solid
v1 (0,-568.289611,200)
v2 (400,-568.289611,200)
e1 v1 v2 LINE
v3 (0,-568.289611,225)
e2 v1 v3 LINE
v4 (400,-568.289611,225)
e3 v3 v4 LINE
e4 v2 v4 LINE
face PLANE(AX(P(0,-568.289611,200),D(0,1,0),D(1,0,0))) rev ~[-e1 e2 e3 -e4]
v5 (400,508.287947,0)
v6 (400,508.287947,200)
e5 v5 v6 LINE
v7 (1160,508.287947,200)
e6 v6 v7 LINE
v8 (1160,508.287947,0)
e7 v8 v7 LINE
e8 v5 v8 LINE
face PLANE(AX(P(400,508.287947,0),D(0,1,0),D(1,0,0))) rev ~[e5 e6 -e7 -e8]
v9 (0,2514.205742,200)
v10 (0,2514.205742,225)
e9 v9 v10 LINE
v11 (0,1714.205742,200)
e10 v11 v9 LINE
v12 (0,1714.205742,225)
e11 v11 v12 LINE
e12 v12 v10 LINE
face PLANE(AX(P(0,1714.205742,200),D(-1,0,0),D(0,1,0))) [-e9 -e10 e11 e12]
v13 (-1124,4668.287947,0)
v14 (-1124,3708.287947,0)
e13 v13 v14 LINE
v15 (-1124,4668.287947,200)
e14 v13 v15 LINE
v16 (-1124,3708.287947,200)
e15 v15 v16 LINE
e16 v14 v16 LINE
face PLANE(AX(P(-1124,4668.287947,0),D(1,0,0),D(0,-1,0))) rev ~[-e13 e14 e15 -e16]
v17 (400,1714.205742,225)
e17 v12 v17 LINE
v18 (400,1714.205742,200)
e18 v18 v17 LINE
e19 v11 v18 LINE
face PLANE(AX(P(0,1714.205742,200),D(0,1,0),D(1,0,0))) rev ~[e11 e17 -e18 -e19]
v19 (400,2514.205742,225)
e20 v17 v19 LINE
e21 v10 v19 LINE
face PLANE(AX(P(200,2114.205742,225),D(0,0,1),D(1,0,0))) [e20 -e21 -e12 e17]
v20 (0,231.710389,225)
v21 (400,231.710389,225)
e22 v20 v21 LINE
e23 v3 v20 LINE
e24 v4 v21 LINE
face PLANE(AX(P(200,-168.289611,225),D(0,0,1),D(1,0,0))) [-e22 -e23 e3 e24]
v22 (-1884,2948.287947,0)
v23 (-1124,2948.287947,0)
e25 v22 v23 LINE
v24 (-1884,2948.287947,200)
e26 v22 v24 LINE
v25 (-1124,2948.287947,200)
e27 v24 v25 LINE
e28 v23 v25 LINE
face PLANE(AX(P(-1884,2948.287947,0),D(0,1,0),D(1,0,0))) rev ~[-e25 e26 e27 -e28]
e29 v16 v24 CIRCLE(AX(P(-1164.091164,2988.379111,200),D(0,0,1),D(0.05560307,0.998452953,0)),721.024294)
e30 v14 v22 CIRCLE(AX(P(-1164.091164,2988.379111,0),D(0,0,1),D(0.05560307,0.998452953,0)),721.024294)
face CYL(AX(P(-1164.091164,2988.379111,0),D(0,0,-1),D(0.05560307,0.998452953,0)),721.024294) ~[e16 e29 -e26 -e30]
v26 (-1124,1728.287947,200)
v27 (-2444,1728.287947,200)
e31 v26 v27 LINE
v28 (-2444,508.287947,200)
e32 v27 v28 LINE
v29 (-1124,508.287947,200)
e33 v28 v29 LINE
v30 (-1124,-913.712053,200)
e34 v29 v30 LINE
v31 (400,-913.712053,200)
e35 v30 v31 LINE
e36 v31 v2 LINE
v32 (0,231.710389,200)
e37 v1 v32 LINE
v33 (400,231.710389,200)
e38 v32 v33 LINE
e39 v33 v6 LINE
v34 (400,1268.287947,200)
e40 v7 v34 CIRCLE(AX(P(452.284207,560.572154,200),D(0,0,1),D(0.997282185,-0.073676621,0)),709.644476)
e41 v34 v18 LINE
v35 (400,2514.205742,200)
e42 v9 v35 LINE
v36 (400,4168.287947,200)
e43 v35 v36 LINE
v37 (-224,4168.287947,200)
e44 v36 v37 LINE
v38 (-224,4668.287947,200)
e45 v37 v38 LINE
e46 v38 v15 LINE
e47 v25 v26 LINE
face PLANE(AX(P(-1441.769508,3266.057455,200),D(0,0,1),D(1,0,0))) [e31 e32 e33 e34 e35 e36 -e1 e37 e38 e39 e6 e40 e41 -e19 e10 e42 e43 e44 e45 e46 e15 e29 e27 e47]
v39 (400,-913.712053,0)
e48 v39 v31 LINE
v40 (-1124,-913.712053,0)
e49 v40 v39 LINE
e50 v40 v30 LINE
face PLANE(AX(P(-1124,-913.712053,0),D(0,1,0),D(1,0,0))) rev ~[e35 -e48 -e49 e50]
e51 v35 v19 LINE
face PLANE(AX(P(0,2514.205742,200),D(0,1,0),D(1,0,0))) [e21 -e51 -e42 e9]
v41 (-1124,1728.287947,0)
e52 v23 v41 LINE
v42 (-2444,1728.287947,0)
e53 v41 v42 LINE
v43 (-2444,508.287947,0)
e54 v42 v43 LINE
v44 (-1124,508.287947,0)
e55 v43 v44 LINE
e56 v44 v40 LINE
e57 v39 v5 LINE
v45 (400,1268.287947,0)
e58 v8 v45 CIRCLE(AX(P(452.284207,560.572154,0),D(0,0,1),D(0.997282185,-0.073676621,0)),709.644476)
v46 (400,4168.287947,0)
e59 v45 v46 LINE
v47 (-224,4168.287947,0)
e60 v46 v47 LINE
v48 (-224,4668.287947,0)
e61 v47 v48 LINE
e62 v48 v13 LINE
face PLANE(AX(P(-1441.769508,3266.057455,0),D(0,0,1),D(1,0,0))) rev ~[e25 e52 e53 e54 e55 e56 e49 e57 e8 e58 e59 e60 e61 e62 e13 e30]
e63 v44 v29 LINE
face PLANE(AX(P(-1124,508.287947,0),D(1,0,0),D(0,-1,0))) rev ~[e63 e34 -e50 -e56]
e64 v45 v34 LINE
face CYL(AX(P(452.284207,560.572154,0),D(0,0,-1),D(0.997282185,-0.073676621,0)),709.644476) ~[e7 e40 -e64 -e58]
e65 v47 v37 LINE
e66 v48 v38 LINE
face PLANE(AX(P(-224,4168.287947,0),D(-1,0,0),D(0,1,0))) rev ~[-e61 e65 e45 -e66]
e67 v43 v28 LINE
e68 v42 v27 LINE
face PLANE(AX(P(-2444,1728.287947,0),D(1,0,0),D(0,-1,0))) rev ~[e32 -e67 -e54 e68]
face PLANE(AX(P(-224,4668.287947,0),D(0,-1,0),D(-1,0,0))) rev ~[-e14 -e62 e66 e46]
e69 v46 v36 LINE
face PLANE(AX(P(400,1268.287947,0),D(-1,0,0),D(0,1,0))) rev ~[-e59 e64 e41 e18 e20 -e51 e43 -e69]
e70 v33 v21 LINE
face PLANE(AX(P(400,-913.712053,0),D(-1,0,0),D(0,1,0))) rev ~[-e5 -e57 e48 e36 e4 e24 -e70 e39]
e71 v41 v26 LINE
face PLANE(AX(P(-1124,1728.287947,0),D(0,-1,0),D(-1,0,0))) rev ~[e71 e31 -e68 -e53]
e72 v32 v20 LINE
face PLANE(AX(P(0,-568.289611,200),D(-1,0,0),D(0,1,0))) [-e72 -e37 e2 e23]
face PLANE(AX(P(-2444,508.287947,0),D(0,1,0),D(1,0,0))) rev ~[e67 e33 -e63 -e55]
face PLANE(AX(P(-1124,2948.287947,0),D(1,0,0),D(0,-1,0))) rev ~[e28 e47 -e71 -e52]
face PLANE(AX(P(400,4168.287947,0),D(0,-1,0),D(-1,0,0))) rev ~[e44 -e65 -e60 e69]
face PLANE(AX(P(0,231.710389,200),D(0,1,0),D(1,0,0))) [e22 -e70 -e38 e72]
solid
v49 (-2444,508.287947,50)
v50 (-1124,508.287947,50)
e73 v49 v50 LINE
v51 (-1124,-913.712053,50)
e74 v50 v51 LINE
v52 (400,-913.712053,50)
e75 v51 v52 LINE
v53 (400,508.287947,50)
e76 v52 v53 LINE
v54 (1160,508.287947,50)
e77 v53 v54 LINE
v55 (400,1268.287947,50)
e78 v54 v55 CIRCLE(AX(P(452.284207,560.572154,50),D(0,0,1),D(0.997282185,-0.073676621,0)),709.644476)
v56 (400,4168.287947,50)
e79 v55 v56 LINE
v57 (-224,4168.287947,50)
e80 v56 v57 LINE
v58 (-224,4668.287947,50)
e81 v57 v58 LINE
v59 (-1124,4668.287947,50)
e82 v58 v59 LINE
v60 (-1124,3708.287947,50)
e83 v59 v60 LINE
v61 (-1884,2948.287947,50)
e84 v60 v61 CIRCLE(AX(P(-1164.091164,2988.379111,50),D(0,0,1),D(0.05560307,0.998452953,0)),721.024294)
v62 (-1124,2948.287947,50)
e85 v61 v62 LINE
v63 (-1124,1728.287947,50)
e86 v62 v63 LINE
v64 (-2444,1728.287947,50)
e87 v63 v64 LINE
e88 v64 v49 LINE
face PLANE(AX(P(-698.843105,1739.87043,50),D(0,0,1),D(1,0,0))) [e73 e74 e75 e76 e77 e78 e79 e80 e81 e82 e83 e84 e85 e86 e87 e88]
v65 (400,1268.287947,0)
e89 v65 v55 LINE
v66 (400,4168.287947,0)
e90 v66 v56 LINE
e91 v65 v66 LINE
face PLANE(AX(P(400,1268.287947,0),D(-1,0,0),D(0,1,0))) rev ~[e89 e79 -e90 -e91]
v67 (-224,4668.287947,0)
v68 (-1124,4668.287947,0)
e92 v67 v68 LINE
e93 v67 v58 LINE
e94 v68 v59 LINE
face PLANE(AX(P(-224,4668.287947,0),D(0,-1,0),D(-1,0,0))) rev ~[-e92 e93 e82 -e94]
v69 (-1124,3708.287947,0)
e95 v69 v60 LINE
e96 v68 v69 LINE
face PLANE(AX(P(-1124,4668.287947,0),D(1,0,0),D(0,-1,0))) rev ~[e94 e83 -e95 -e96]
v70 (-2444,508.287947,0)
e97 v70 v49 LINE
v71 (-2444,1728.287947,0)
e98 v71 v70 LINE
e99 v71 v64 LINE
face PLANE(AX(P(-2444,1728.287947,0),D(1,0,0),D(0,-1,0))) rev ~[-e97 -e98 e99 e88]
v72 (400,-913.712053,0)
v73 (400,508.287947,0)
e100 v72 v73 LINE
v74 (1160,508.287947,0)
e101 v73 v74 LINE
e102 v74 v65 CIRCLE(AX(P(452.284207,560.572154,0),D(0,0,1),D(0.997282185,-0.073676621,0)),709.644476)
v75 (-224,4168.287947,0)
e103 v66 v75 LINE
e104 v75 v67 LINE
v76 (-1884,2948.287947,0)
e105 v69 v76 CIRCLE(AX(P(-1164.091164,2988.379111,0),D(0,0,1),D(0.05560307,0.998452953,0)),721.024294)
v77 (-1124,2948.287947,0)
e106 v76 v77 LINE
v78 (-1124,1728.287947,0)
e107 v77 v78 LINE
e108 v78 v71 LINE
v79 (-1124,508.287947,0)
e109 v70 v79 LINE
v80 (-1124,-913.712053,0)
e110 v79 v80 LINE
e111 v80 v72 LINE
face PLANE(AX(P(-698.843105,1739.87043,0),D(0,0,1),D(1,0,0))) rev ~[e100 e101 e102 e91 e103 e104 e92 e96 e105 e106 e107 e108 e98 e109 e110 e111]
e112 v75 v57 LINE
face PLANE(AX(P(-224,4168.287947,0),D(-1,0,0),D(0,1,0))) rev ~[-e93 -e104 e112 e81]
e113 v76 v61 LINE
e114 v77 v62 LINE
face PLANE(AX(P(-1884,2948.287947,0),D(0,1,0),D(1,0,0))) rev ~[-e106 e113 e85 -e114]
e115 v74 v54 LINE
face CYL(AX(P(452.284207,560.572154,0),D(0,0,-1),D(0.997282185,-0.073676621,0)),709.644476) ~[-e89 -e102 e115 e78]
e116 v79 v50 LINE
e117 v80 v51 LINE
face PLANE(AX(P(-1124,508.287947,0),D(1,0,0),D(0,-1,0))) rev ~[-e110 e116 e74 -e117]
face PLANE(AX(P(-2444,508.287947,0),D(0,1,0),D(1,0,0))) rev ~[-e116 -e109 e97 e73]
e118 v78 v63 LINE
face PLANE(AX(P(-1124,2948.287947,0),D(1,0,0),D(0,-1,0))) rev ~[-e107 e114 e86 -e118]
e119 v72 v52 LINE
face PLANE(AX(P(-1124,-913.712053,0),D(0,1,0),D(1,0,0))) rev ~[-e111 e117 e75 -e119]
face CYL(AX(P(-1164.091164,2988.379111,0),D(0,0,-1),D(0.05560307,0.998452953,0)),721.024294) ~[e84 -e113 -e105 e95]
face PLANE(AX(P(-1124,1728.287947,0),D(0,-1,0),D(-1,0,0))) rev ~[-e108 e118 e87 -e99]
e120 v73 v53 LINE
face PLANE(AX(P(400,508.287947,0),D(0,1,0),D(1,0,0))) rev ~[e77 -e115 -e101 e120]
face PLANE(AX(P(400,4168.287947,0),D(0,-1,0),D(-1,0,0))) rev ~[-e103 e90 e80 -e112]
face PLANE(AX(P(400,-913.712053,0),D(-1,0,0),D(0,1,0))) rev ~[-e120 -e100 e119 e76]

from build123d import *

# Parameters (mm, degrees)
F1_DEPTH = 200
F2_DEPTH = 50
F3_W     = 400
F3_H     = 800
F4_DEPTH = 25


# Not quite as in the source:
# - a feature names something its author has since deleted; it is built from what else it names


with BuildPart() as f1:
    # F0 (on Top) → F1 (new body)
    with BuildSketch(Plane.XY):
        with BuildLine():
            Line((-1884, 2948.2879470328), (-1124, 2948.2879470328))
            Line((-1124, 2948.2879470328), (-1124, 3708.2879470328))
            ThreePointArc((-1124, 3708.2879470328), (-1673.932332285, 3498.2202793178), (-1884, 2948.2879470328))
        make_face()
        Polygon((-1124, 508.2879470328), (-1124, -913.7120529672), (400, -913.7120529672), (400, -477.0959615707), (400, 330.1213979721), (400, 508.2879470328), (400, 1268.2879470328), (400, 1627.2879470328), (400, 2427.2879470328), (400, 4168.2879470328), (-224, 4168.2879470328), (-224, 4668.2879470328), (-1124, 4668.2879470328), (-1124, 4168.2879470328), (-1124, 3708.2879470328), (-1124, 2948.2879470328), (-1124, 1728.2879470328), (-2444, 1728.2879470328), (-2444, 508.2879470328), align=None)
        with BuildLine():
            Line((400, 1268.2879470328), (400, 508.2879470328))
            Line((400, 508.2879470328), (1160, 508.2879470328))
            ThreePointArc((1160, 508.2879470328), (954.0786279741, 1062.366575007), (400, 1268.2879470328))
        make_face()
    extrude(amount=F1_DEPTH)

    # F3 (on face) → F4 (join)
    with BuildSketch(Plane.XY.offset(200)):
        with Locations((200, 2114.2057418823)):
            Rectangle(F3_W, F3_H)
        with Locations((200, -168.2896107435)):
            Rectangle(F3_W, F3_H)
    extrude(amount=F4_DEPTH)


with BuildPart() as f2:
    # F0 (on Top) → F2 (new body)
    with BuildSketch(Plane.XY):
        Polygon((-1124, 508.2879470328), (-1124, -913.7120529672), (400, -913.7120529672), (400, -477.0959615707), (400, 330.1213979721), (400, 508.2879470328), (400, 1268.2879470328), (400, 1627.2879470328), (400, 2427.2879470328), (400, 4168.2879470328), (-224, 4168.2879470328), (-224, 4668.2879470328), (-1124, 4668.2879470328), (-1124, 4168.2879470328), (-1124, 3708.2879470328), (-1124, 2948.2879470328), (-1124, 1728.2879470328), (-2444, 1728.2879470328), (-2444, 508.2879470328), align=None)
        with BuildLine():
            Line((400, 1268.2879470328), (400, 508.2879470328))
            Line((400, 508.2879470328), (1160, 508.2879470328))
            ThreePointArc((1160, 508.2879470328), (954.0786279741, 1062.366575007), (400, 1268.2879470328))
        make_face()
        with BuildLine():
            Line((-1884, 2948.2879470328), (-1124, 2948.2879470328))
            Line((-1124, 2948.2879470328), (-1124, 3708.2879470328))
            ThreePointArc((-1124, 3708.2879470328), (-1673.932332285, 3498.2202793178), (-1884, 2948.2879470328))
        make_face()
    extrude(amount=F2_DEPTH)


solid = Compound([f1.part, f2.part])
